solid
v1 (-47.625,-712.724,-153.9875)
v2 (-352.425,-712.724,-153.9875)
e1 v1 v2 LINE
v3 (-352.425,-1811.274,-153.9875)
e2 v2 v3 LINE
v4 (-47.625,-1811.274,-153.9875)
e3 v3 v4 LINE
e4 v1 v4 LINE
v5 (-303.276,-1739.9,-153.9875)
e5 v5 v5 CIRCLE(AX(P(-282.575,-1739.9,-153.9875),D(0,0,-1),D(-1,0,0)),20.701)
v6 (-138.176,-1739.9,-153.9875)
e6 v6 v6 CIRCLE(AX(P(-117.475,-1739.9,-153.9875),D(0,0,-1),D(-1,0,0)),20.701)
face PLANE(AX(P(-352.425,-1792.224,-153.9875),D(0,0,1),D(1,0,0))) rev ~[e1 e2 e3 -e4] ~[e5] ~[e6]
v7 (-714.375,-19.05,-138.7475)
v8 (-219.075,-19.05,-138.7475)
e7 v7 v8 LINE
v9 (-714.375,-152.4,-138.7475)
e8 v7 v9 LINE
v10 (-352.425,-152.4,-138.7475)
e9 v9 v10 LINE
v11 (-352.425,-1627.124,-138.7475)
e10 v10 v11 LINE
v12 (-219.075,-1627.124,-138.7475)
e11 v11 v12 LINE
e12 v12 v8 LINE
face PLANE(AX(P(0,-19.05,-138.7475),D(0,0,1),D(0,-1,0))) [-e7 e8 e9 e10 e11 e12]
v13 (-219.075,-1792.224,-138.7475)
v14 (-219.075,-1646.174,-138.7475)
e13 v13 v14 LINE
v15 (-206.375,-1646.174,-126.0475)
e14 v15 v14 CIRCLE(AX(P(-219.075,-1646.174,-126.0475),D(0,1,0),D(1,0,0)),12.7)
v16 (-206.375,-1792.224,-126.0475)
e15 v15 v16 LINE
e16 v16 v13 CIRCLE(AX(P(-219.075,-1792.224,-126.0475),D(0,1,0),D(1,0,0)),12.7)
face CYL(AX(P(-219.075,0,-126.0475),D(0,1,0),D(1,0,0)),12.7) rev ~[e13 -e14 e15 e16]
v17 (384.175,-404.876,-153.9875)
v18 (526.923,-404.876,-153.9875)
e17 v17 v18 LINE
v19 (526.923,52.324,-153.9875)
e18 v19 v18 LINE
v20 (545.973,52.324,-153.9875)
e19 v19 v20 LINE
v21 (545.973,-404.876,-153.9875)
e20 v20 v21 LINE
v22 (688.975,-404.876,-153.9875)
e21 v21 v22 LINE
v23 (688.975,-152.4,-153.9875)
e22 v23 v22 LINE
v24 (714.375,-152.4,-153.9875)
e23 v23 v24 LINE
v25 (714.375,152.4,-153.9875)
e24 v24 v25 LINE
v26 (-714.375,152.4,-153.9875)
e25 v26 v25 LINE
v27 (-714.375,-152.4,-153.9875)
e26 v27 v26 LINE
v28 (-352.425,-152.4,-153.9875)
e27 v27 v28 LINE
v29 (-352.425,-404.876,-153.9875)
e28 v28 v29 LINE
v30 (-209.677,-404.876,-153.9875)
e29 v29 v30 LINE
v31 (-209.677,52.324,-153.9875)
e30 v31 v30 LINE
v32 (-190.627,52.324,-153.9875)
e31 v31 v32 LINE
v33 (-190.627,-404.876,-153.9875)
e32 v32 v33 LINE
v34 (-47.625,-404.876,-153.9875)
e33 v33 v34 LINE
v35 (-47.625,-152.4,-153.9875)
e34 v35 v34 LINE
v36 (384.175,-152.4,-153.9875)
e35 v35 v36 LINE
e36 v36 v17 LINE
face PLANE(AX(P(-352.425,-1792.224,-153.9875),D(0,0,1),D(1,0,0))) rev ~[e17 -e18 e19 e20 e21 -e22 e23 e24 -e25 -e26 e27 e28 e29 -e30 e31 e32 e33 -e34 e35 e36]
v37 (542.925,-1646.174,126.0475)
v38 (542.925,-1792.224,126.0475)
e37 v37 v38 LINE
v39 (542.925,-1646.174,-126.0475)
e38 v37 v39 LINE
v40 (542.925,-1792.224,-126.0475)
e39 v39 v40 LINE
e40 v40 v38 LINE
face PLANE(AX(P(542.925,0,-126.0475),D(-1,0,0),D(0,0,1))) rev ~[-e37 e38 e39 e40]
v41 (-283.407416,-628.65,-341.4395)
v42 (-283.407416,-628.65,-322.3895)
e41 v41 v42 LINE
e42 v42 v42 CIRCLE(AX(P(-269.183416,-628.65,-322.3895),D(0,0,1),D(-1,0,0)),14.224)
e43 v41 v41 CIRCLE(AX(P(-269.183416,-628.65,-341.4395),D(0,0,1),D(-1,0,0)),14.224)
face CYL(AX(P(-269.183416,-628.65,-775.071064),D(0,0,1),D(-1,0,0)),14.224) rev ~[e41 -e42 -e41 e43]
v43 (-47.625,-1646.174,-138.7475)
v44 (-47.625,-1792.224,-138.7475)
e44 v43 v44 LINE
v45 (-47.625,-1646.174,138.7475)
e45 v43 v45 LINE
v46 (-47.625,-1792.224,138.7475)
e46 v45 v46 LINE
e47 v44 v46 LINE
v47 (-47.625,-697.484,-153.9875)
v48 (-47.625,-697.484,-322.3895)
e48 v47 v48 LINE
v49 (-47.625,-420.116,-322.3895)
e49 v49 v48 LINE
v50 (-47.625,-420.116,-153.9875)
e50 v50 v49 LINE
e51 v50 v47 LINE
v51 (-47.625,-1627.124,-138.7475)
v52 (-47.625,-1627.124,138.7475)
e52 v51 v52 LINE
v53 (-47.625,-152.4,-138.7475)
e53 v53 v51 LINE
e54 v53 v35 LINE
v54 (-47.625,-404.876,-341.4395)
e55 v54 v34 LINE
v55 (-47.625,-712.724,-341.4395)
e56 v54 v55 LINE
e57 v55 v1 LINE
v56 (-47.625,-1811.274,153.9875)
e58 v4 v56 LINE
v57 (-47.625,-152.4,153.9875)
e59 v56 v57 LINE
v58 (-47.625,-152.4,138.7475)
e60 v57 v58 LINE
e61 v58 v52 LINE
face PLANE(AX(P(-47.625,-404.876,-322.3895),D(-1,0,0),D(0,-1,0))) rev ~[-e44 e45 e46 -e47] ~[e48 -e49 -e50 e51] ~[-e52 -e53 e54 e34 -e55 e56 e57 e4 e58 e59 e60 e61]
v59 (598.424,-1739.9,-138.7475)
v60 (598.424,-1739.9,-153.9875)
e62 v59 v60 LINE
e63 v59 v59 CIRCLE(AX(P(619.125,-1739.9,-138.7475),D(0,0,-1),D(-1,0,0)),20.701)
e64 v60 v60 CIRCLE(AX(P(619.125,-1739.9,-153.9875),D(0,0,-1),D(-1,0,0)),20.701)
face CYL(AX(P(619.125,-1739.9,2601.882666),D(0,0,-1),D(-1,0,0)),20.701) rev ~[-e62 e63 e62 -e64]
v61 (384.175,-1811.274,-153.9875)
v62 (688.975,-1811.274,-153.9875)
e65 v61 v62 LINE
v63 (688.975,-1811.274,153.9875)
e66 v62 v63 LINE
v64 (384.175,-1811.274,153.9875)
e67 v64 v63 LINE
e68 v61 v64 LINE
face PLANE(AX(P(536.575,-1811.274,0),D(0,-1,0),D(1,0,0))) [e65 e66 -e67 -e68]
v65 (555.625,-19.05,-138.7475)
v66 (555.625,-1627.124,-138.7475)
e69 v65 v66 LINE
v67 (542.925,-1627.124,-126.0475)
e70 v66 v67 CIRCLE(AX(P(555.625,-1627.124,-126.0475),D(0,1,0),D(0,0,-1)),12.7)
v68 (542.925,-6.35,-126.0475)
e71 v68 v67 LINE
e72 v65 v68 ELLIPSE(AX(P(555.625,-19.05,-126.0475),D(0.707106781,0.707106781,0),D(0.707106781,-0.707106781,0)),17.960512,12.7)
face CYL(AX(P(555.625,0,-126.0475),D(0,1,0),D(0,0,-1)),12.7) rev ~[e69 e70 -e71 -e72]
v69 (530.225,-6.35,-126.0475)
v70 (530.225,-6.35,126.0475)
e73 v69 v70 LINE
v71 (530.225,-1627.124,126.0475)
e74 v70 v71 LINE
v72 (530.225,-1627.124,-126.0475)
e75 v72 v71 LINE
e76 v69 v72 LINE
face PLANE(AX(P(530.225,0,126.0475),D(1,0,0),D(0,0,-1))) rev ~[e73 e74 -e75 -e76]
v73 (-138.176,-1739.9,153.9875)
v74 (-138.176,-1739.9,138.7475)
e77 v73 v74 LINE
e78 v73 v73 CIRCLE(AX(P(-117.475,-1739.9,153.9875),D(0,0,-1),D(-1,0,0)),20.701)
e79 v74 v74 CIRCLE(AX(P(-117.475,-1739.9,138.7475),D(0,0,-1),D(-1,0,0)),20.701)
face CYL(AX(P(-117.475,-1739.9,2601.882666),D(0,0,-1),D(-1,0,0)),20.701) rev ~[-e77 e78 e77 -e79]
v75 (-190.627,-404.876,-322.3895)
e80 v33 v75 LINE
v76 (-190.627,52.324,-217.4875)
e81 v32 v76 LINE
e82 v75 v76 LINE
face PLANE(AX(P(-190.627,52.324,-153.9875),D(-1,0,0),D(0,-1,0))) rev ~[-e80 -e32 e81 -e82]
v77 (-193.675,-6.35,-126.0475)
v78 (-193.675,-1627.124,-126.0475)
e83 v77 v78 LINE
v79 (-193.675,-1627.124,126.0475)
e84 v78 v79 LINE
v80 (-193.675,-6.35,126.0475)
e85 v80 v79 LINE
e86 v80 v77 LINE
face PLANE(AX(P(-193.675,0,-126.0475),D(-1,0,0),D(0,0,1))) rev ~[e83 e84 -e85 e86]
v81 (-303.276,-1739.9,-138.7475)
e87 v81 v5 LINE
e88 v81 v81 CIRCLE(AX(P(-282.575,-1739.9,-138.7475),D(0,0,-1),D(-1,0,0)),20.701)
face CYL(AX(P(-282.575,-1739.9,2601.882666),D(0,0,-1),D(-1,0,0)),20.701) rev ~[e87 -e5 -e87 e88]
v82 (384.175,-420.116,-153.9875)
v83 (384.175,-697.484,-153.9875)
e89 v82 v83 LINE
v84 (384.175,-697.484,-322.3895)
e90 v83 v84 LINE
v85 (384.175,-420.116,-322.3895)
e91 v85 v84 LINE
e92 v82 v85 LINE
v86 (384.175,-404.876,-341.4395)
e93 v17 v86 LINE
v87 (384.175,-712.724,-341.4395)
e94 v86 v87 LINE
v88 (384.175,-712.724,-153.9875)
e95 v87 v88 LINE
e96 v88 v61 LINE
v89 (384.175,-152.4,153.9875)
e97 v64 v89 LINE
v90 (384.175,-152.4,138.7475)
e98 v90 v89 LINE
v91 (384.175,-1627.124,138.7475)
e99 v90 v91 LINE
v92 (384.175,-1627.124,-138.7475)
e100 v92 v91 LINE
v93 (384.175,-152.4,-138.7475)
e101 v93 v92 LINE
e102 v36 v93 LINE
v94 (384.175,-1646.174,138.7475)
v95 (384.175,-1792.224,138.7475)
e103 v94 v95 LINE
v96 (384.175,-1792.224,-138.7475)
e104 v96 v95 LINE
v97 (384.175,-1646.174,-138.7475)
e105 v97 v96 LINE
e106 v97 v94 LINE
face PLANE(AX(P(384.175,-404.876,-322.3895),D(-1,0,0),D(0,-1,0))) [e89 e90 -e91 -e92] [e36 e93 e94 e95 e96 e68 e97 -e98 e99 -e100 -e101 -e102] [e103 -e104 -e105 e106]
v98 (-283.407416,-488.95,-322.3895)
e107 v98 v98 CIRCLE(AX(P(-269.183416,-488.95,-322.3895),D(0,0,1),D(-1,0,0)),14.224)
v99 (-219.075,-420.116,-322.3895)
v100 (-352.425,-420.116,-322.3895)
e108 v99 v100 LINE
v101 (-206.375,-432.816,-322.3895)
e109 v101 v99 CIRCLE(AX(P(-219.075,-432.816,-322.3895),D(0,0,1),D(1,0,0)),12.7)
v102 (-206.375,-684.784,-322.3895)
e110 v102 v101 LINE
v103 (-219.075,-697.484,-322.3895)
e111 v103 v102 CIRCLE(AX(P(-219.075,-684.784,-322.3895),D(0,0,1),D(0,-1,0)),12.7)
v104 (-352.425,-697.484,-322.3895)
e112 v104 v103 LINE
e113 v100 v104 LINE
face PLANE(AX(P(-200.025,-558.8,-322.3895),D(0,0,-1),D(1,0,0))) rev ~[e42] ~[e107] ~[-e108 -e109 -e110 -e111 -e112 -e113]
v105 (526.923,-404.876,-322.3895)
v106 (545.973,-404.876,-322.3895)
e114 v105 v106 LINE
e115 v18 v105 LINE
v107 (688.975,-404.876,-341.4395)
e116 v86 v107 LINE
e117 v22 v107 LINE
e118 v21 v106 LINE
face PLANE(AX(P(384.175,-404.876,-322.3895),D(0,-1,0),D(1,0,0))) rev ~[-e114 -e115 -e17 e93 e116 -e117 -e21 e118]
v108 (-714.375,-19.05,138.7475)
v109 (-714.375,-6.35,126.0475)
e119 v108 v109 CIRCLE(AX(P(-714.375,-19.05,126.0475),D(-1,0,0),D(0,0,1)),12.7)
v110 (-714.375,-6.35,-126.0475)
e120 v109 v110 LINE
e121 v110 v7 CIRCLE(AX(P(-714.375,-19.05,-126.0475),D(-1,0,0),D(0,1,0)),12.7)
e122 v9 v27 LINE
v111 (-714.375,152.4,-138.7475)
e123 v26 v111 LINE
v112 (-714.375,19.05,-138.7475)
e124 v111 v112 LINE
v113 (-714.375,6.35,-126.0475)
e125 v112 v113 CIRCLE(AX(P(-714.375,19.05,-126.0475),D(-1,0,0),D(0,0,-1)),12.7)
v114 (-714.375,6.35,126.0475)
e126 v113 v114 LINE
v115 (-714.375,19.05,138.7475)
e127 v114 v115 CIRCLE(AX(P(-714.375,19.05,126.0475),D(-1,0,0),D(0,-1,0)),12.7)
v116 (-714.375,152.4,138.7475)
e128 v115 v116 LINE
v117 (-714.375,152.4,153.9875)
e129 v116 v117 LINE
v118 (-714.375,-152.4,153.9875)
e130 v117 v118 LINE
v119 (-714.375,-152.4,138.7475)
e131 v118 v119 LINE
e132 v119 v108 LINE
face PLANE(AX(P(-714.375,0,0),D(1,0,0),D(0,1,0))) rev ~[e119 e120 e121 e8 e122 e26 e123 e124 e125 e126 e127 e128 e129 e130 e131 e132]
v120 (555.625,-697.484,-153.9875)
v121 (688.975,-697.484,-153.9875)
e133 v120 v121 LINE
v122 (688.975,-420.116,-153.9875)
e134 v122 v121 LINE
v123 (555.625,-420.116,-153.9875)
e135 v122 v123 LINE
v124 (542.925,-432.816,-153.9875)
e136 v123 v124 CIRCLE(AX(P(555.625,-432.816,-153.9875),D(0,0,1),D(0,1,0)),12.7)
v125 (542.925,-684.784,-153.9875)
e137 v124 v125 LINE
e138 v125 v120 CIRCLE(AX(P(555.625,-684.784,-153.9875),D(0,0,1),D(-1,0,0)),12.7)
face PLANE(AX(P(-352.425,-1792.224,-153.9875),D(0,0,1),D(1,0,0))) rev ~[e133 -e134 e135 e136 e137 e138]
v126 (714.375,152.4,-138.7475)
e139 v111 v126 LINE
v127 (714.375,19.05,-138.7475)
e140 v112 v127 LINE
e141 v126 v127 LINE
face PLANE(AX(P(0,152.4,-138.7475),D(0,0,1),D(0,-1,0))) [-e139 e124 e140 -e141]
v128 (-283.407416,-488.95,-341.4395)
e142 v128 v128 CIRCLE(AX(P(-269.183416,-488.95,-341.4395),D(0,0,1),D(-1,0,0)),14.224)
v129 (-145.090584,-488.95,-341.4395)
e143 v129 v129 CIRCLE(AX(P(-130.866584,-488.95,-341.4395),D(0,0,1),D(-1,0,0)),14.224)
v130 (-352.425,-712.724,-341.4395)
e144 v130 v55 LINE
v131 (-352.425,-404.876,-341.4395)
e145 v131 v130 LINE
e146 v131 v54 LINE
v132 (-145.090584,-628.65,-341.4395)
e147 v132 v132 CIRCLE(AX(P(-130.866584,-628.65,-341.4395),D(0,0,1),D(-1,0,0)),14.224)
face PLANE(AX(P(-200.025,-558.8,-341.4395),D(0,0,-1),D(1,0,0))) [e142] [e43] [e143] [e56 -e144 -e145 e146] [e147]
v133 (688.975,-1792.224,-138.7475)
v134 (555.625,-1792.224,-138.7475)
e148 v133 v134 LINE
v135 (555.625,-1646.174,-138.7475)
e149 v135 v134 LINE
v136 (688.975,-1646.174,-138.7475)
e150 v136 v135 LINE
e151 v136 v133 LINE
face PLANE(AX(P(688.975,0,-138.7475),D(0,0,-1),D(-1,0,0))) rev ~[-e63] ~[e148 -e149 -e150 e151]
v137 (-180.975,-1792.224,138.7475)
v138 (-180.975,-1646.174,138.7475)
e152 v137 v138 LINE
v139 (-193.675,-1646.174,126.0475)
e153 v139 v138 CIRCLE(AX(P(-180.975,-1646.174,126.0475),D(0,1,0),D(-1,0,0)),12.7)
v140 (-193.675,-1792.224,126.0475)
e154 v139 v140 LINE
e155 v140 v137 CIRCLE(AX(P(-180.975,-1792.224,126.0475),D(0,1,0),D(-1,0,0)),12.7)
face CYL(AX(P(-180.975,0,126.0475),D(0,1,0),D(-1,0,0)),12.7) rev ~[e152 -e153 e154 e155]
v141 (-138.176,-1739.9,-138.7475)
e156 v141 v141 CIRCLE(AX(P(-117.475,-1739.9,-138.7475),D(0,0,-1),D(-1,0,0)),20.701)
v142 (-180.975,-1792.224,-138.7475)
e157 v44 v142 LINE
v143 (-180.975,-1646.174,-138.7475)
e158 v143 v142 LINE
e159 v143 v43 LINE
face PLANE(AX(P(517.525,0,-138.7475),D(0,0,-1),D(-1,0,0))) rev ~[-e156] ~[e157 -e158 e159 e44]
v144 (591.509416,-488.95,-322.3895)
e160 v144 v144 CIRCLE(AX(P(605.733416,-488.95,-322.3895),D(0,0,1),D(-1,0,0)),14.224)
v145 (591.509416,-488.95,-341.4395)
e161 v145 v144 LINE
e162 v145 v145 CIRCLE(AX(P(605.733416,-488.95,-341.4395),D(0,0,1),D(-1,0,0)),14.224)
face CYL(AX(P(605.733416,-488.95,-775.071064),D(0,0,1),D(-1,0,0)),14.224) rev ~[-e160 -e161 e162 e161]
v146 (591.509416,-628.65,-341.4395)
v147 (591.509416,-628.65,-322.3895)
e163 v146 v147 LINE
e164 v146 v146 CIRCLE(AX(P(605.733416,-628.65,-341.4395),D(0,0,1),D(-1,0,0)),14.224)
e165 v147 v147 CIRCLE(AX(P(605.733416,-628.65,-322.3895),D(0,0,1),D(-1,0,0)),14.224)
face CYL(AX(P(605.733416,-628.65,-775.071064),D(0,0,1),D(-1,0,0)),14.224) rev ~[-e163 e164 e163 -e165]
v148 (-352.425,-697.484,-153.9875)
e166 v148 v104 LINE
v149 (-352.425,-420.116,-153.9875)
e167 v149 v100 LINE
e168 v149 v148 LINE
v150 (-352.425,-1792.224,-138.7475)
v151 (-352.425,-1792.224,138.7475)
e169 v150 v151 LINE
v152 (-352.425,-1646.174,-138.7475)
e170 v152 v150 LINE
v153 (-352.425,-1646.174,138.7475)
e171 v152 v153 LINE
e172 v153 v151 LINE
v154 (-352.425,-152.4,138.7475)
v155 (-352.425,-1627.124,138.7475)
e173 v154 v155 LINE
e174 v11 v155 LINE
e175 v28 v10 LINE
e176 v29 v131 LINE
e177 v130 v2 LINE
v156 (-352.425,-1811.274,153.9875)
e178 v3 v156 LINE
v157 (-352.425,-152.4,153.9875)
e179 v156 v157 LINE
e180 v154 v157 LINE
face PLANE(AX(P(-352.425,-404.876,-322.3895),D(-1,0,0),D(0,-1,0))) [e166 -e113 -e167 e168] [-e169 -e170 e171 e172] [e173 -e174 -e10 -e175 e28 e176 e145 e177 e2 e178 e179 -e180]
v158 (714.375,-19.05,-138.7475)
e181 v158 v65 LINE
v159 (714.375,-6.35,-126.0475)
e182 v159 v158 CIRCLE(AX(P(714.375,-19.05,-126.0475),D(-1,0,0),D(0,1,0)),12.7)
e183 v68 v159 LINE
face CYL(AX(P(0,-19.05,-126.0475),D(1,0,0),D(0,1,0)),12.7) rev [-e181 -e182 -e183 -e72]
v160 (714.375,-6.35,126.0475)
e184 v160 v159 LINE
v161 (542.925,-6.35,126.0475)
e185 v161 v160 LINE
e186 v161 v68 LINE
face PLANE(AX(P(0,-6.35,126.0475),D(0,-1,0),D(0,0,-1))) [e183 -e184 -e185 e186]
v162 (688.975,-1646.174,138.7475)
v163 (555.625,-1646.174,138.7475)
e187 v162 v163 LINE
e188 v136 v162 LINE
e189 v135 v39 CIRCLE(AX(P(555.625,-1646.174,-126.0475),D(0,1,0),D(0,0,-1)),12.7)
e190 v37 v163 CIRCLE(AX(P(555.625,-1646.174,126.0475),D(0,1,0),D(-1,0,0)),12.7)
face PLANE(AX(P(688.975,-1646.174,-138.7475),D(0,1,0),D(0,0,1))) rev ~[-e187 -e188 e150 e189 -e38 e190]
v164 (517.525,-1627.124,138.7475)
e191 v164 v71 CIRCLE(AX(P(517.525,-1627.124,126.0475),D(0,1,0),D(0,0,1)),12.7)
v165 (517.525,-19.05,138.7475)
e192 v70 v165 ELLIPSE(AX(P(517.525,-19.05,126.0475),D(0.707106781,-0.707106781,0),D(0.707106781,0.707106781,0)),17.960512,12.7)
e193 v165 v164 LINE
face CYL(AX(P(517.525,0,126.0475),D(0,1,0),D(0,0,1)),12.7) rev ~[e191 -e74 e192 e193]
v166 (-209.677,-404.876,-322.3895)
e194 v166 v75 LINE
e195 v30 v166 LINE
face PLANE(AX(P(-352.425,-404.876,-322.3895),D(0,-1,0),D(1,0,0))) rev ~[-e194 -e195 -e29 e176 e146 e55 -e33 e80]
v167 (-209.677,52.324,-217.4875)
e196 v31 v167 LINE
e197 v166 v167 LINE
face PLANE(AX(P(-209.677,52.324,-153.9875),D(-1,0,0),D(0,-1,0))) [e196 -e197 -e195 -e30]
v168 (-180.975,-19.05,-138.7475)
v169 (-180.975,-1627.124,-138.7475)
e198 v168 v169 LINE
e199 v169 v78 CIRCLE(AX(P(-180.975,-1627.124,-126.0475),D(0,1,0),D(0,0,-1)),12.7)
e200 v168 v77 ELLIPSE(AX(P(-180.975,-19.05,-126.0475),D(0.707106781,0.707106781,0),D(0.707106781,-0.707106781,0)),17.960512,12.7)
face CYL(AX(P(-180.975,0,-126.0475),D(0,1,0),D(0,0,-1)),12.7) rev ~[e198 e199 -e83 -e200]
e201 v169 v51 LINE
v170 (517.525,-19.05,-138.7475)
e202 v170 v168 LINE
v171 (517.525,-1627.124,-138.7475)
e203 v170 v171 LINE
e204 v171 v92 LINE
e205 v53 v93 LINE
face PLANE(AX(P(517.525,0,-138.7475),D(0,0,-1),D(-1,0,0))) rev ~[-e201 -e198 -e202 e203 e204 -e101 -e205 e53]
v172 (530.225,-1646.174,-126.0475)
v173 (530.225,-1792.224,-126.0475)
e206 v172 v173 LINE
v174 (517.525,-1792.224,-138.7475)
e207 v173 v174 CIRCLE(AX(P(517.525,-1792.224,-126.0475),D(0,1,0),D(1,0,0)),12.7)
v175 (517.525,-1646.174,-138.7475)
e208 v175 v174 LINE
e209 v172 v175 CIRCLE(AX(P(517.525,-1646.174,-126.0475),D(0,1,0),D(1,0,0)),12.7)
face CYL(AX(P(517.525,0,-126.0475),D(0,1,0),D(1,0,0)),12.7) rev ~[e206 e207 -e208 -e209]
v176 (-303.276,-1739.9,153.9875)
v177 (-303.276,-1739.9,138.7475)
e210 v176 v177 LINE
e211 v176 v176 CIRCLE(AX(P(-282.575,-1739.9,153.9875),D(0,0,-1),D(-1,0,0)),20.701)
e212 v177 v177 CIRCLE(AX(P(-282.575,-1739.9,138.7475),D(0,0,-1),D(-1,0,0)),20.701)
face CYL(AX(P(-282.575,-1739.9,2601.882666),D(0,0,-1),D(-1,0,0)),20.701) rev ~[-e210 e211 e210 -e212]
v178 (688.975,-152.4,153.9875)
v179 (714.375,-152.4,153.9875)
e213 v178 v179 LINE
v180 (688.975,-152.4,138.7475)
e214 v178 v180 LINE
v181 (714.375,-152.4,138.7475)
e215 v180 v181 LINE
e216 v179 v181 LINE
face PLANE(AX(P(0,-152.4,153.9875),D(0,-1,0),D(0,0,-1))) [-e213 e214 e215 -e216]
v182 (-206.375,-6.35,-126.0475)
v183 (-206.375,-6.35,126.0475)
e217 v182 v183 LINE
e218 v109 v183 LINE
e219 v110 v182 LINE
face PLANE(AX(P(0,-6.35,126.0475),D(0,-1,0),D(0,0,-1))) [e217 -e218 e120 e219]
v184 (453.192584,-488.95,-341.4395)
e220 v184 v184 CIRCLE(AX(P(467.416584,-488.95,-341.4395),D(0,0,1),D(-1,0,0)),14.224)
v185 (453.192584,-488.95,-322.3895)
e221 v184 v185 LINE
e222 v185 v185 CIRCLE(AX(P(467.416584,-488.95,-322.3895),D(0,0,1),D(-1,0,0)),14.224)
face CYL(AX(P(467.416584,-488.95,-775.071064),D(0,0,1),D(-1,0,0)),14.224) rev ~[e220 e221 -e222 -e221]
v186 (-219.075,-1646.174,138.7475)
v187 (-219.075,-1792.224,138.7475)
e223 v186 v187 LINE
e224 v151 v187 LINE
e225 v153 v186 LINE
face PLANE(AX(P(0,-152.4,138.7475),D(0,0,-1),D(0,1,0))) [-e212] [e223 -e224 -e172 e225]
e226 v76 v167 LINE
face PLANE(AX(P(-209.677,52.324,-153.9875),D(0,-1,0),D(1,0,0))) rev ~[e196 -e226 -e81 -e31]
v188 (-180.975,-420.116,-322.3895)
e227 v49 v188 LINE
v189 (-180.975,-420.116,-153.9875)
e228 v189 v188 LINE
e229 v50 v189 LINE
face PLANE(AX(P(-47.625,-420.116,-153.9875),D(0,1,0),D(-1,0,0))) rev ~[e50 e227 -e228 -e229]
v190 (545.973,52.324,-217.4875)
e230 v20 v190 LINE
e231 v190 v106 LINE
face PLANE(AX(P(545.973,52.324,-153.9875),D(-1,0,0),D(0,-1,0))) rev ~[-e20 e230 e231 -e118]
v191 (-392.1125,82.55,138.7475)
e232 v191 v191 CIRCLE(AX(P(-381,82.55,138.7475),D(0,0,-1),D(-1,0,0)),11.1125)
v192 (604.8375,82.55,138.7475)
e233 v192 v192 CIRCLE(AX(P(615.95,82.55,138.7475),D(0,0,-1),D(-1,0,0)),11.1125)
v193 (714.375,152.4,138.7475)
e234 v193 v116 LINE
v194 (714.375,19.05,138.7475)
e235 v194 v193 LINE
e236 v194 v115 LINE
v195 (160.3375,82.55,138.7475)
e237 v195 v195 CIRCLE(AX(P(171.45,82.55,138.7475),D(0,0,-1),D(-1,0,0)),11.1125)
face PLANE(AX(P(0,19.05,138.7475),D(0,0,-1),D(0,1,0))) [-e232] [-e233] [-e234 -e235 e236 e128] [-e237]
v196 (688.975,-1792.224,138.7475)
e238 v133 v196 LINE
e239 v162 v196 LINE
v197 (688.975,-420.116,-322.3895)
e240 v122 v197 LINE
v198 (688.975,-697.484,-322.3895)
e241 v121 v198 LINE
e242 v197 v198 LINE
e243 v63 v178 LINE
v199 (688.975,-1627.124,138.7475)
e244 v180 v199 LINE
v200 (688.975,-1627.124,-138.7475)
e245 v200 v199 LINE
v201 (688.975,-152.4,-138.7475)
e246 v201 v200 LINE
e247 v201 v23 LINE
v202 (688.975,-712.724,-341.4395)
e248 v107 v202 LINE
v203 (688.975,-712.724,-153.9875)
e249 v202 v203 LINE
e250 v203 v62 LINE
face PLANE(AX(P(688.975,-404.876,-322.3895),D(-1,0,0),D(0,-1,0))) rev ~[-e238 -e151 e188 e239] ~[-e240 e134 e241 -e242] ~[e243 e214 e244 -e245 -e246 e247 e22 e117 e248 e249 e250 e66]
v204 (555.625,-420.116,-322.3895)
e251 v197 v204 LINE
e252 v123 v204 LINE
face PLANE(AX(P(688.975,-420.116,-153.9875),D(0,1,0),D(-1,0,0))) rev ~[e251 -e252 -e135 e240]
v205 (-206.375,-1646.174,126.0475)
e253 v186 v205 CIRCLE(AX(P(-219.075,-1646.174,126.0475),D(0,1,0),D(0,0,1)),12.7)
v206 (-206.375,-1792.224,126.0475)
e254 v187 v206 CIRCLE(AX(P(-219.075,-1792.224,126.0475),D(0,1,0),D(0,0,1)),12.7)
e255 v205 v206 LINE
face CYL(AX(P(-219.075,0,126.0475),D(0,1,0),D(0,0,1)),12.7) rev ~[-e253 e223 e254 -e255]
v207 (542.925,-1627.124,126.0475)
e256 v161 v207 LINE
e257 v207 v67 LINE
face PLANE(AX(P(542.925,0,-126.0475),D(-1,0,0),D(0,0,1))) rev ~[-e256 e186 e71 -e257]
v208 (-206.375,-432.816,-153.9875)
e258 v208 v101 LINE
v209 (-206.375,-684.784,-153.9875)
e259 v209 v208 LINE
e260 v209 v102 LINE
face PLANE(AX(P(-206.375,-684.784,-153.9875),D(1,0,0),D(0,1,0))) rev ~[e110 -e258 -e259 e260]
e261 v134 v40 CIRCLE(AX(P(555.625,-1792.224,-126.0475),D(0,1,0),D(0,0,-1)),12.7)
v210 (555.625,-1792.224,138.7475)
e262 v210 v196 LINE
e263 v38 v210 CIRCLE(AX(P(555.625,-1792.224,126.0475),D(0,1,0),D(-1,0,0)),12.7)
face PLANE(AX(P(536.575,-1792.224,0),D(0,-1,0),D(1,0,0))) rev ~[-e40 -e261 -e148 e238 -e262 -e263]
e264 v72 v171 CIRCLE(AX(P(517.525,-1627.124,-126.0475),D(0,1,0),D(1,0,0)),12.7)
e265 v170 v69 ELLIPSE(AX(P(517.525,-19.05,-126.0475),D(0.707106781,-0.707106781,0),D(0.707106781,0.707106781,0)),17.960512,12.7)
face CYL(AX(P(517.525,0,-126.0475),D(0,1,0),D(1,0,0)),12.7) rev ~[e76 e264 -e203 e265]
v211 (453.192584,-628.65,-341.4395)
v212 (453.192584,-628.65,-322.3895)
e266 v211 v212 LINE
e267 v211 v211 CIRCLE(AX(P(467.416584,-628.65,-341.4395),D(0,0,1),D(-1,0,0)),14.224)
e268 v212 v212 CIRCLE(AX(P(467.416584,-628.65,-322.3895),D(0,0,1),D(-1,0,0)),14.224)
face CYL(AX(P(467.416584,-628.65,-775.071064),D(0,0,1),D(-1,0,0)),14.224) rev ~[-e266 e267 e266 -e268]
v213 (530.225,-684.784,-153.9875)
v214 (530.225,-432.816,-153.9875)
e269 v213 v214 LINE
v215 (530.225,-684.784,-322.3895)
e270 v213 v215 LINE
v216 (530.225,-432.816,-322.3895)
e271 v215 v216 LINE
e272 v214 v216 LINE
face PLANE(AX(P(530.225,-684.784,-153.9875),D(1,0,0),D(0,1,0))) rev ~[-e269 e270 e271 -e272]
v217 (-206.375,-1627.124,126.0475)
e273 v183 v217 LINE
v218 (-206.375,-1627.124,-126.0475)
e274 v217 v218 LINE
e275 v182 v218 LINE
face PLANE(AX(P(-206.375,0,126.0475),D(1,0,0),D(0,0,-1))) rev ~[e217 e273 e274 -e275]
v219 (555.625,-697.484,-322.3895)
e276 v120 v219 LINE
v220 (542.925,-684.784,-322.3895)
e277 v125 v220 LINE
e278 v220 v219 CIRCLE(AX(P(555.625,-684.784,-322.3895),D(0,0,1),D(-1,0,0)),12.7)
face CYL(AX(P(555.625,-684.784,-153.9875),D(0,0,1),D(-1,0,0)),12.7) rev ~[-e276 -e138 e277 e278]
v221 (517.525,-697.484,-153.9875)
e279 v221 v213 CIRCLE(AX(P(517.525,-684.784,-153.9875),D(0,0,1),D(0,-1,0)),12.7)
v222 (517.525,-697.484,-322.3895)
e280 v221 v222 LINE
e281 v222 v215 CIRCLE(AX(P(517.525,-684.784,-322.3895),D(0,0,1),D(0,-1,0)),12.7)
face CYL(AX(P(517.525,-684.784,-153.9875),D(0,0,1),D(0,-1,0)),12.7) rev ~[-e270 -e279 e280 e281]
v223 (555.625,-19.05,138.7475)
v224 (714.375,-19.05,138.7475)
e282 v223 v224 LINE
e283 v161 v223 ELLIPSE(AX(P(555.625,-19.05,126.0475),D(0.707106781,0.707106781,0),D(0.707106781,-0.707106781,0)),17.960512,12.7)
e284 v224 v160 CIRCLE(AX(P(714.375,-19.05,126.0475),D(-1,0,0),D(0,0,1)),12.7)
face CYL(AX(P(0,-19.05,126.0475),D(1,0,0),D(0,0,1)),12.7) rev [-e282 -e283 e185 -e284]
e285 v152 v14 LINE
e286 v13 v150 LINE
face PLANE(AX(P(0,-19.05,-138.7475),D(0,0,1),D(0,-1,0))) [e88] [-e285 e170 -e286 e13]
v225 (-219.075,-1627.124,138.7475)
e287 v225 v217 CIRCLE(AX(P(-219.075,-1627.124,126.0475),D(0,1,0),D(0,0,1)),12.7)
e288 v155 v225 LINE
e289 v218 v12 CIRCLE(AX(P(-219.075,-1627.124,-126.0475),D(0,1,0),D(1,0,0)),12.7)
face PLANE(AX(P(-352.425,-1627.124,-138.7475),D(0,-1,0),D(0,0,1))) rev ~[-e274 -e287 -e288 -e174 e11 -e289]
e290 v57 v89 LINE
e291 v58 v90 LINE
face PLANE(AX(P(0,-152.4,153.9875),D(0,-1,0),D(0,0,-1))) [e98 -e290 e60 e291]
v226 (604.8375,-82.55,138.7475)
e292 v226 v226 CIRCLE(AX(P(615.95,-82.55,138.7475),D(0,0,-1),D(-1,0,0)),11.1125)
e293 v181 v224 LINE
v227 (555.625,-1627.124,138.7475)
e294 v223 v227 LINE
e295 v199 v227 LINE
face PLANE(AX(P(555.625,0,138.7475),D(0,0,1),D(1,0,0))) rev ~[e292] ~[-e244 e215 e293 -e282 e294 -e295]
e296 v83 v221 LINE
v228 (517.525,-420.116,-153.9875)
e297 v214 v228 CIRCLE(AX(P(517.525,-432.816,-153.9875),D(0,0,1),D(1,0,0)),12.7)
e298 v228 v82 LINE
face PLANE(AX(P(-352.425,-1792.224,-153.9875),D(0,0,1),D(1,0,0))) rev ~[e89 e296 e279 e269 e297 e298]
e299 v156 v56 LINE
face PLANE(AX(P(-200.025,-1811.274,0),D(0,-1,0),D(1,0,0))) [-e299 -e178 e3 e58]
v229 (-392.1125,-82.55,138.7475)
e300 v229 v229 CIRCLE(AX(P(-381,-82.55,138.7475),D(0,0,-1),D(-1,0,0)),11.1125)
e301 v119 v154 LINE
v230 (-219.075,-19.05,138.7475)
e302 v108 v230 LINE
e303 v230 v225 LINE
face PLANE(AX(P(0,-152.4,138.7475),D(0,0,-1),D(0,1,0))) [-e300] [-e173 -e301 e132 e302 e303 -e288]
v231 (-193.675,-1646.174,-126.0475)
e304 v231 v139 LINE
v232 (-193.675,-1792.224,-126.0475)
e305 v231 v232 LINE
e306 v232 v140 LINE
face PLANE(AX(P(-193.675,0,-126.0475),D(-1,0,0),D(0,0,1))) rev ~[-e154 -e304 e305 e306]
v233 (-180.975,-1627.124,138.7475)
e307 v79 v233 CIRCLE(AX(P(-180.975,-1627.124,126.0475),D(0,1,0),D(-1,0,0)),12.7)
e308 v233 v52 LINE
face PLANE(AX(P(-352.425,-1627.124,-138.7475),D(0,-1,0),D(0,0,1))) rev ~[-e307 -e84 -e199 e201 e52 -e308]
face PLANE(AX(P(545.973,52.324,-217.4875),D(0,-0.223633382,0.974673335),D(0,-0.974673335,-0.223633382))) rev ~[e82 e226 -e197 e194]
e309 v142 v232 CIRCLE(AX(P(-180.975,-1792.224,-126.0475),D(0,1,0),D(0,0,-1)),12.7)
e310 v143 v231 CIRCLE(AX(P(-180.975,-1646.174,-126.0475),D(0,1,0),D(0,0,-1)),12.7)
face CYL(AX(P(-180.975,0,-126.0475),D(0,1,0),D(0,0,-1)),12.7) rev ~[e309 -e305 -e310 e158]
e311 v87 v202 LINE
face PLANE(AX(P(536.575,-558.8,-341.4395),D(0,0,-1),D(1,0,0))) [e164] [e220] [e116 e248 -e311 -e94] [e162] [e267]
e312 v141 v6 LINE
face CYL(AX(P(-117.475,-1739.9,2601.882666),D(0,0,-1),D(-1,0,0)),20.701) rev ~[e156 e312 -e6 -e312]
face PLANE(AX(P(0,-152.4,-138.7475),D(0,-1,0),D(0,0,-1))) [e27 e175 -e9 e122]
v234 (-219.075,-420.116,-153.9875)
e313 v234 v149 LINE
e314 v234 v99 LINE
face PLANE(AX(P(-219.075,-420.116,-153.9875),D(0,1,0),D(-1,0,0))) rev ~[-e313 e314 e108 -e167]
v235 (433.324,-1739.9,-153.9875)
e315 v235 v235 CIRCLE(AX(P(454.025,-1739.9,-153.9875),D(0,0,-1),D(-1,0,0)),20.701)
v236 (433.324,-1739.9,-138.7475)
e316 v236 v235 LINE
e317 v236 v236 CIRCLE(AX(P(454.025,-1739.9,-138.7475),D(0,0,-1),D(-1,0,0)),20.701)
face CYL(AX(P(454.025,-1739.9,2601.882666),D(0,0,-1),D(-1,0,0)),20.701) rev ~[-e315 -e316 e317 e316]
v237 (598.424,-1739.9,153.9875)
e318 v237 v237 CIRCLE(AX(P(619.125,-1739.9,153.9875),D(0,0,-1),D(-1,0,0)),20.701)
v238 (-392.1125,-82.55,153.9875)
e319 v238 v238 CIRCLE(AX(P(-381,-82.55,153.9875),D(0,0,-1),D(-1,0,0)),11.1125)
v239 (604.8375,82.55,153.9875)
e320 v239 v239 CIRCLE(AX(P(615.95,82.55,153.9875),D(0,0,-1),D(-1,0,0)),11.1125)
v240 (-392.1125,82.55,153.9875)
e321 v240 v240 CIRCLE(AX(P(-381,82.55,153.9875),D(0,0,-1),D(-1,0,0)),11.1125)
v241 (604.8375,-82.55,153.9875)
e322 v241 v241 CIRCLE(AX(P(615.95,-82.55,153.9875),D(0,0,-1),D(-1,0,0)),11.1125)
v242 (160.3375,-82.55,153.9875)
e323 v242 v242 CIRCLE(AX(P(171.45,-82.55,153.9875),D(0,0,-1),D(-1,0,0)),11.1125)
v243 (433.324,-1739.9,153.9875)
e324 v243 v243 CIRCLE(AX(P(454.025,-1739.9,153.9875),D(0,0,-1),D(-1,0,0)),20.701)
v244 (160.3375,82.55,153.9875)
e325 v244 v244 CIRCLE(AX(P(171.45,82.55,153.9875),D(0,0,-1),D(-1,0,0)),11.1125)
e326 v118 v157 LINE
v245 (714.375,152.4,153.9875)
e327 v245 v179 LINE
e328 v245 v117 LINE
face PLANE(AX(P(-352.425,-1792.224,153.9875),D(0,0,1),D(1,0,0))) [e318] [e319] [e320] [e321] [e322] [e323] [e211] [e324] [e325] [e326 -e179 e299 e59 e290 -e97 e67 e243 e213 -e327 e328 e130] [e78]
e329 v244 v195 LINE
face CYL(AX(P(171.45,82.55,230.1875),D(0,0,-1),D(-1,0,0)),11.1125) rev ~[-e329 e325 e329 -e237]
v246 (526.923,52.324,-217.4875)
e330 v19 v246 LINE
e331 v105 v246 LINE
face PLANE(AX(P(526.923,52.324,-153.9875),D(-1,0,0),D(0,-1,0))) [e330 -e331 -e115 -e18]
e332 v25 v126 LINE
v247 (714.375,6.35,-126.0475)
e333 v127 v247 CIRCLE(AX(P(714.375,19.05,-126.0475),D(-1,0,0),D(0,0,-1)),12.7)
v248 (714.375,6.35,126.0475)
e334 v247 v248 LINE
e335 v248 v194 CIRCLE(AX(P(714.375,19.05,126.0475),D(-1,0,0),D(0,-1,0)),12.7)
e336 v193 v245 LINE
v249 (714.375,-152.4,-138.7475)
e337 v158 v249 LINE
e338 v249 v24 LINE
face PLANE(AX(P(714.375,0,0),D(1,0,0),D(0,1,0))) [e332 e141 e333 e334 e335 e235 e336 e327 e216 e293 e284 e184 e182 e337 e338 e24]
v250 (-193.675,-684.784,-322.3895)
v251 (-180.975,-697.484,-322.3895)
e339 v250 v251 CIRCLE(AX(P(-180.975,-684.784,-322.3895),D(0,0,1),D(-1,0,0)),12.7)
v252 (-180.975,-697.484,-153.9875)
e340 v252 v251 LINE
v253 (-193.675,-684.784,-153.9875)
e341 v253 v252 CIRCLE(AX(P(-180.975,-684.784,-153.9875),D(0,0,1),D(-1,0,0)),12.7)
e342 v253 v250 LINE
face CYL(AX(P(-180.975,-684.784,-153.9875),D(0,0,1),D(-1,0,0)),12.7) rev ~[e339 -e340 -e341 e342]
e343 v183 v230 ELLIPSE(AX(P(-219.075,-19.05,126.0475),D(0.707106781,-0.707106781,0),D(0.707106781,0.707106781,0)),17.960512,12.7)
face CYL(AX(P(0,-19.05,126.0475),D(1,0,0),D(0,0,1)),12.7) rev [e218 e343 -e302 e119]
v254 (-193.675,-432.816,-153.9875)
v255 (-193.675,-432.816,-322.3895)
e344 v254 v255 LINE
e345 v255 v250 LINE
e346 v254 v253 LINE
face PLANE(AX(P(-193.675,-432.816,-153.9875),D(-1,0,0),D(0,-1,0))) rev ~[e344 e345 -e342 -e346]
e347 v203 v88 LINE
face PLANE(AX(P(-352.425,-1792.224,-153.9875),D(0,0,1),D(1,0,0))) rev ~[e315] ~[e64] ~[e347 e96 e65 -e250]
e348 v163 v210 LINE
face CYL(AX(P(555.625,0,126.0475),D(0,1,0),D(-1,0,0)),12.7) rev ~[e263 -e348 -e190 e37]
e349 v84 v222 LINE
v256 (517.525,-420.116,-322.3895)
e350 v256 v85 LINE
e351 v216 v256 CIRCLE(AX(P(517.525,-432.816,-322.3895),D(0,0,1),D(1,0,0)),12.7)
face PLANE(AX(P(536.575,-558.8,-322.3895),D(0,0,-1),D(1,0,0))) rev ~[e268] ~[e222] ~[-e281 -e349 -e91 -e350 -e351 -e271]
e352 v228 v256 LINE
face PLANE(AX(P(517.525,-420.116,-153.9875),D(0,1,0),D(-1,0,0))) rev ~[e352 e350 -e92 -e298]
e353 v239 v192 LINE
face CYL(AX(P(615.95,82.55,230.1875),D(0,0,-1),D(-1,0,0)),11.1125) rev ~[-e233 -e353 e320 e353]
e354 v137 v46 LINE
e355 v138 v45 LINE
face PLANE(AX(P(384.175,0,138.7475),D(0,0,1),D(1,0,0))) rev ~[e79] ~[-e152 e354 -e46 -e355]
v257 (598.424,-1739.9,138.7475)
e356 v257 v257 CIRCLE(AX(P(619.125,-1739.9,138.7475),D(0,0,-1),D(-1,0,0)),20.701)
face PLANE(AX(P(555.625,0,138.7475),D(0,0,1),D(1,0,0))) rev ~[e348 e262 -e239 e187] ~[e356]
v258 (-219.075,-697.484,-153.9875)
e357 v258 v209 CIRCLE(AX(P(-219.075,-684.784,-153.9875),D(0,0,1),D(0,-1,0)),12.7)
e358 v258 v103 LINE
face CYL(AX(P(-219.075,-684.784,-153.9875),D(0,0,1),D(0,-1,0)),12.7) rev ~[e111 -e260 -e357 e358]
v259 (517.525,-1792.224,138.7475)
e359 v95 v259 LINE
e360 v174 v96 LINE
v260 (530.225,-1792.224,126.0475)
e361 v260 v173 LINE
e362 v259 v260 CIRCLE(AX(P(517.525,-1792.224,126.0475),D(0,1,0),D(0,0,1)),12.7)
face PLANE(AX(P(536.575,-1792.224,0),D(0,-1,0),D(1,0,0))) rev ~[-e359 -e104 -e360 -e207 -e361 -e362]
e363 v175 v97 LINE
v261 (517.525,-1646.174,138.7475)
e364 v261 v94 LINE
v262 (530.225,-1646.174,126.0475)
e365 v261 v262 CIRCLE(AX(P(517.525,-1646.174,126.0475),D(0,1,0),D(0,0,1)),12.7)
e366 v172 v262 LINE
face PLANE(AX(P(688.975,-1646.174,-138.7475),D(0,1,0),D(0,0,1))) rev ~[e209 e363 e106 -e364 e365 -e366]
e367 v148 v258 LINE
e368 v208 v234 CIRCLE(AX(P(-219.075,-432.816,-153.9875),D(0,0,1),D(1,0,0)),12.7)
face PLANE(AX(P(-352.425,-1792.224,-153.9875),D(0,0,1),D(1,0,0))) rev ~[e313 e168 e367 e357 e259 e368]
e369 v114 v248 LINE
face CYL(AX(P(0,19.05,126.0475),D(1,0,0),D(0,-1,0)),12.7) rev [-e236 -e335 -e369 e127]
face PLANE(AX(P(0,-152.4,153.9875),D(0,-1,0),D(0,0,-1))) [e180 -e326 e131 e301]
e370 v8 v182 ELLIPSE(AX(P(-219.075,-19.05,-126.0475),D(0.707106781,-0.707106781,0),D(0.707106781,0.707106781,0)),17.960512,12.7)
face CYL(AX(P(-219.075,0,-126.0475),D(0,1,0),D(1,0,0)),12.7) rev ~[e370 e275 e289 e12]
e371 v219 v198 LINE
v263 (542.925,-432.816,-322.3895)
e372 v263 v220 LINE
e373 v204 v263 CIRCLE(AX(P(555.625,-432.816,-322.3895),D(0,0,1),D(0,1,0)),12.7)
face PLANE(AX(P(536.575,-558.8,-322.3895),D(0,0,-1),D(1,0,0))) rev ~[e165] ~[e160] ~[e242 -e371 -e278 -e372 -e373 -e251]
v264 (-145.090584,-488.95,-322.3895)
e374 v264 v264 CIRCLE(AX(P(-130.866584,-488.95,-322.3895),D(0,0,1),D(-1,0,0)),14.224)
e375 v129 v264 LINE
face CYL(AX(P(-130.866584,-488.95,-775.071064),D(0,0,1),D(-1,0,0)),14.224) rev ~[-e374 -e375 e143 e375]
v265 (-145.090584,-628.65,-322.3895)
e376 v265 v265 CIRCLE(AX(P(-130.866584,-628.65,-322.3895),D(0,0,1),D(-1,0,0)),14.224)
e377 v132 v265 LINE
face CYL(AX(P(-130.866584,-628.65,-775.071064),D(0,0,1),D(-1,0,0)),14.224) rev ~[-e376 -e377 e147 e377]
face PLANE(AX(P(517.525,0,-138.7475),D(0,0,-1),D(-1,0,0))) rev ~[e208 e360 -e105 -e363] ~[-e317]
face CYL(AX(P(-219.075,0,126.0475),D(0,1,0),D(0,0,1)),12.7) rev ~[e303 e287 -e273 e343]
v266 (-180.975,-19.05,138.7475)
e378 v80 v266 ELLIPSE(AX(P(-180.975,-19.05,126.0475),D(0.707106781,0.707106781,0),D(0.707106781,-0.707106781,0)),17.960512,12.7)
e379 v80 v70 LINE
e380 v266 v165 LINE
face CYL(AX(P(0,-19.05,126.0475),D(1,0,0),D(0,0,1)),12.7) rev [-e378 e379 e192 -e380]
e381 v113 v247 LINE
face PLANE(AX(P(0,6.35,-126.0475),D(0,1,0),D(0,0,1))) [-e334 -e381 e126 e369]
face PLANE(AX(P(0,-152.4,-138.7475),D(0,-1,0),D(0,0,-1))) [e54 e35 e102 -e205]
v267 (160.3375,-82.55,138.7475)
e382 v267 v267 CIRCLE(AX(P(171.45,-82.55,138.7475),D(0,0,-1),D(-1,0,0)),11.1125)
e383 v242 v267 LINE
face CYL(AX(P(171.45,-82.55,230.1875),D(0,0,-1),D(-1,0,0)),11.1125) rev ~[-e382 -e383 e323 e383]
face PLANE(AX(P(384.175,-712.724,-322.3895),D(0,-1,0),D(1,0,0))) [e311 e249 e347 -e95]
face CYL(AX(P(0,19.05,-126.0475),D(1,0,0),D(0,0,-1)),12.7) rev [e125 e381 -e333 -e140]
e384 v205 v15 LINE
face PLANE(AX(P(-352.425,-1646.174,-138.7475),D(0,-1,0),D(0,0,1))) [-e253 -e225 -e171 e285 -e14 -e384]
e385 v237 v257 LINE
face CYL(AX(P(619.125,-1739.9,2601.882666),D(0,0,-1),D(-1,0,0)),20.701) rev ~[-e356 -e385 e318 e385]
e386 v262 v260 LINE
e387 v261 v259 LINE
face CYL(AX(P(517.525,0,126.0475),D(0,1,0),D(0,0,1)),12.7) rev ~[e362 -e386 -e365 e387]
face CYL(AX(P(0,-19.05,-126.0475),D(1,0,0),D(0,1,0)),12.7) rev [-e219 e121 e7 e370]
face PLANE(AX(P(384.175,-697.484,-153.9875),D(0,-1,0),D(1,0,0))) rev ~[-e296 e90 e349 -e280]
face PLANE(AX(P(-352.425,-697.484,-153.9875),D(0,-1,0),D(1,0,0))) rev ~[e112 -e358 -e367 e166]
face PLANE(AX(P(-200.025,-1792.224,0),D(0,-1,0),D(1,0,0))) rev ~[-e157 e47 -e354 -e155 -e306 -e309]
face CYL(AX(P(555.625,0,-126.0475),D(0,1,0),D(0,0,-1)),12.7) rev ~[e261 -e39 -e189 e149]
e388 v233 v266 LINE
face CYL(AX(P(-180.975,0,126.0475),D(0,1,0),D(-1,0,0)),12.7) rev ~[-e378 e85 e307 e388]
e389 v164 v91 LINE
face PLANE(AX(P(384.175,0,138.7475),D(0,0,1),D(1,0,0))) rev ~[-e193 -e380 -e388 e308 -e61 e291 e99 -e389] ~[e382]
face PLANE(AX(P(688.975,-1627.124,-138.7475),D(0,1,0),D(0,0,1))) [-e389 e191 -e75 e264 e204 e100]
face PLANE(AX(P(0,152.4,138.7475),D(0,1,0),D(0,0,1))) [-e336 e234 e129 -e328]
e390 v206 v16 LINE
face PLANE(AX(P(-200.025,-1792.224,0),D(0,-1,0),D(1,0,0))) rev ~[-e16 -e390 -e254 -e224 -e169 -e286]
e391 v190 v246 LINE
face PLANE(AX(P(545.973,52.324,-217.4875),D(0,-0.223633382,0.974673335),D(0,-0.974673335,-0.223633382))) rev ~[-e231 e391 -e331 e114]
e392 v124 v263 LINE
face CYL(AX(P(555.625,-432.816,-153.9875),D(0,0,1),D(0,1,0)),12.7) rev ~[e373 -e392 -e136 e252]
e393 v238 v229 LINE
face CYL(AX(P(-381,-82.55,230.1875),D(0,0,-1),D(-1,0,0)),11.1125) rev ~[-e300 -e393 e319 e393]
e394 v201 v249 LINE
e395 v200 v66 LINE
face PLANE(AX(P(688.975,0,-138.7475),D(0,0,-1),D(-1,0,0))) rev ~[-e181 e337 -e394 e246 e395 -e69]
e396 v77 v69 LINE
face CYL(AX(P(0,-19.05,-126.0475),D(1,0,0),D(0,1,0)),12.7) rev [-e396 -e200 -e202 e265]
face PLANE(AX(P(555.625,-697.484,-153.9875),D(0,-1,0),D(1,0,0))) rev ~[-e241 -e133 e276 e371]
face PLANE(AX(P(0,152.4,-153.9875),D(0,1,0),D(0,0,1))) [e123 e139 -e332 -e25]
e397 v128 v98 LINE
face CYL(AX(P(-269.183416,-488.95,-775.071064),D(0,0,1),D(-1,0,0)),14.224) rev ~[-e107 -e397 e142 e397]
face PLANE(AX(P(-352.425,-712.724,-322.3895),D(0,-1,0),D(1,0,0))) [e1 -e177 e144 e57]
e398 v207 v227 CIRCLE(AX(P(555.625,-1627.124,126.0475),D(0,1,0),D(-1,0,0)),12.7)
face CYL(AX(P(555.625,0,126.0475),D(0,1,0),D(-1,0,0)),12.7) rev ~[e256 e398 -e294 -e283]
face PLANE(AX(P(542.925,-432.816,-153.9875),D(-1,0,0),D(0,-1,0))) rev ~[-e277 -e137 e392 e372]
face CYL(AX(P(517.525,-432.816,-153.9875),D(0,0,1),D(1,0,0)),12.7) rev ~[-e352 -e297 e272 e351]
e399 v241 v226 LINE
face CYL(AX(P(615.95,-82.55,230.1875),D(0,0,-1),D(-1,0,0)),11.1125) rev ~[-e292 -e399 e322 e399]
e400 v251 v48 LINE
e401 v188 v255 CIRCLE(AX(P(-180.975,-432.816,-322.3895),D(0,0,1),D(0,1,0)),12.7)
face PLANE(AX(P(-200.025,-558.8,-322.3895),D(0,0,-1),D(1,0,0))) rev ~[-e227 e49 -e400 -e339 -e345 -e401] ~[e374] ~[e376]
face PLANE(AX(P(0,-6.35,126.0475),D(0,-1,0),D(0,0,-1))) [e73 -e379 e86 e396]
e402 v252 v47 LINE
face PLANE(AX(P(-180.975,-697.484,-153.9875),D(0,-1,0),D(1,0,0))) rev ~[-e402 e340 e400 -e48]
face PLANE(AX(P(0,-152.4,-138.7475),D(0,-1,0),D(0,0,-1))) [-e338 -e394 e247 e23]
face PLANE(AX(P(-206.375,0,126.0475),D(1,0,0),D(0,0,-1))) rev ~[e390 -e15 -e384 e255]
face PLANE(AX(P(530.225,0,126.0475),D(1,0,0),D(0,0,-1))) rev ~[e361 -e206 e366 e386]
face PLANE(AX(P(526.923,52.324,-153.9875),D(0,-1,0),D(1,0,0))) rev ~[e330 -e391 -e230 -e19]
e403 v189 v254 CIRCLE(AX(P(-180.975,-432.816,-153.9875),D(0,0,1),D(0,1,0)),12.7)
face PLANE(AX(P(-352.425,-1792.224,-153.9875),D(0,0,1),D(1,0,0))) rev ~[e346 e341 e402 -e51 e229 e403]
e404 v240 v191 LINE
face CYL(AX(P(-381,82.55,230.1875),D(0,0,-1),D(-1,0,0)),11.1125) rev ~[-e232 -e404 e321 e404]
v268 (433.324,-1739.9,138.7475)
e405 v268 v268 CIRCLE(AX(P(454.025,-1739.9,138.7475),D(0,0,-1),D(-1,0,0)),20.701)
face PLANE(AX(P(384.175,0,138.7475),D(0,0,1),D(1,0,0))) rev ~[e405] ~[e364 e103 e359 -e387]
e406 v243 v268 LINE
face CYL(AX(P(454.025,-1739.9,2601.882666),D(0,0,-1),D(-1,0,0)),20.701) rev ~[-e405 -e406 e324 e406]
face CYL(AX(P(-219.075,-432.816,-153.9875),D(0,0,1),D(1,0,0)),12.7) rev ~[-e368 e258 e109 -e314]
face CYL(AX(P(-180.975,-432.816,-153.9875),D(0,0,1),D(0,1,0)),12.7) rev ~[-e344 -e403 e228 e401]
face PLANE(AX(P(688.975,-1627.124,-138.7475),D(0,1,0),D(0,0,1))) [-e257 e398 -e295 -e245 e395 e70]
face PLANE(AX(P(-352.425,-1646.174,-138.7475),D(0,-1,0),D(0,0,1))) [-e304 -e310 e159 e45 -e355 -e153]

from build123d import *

# Parameters (mm, degrees)
F1_DEPTH  = 714.375
F3_D      = 22.225
F3_DEPTH  = 76.2
F3_TIP    = 6.6770636289
F5_DEPTH  = 1792.224
F6_W      = 304.8
F6_H      = 307.975
F7_DEPTH  = 19.05
F10_D     = 22.225
F10_DEPTH = 76.2
F10_TIP   = 6.6770636289
F11_W     = 19.05
F11_H     = 277.495
F12_DEPTH = 304.8
F13_W     = 19.05
F13_H     = 277.495
F14_DEPTH = 304.8
F16_D     = 41.402
F18_DEPTH = 168.402
F19_W     = 304.8
F19_H     = 307.848
F20_DEPTH = 19.05
F22_D     = 28.448
F22_2_D   = 28.448
F24_W     = 19.05
F24_H     = 457.2
F25_DEPTH = 168.402
F27_DEPTH = 1260.349


# Not quite as in the source:
# - a length typed as a fraction of an inch, garbled in the dataset ("3 / 203.2 mm" for 3/8 in), is restored


with BuildPart() as f1:
    # F0 (on Right) → F1 (new body, symmetric)
    with BuildSketch(Plane.YZ):
        with BuildLine():
            Line((152.4, 153.9875), (-152.4, 153.9875))
            Line((-152.4, 153.9875), (-152.4, 138.7475))
            Line((-152.4, 138.7475), (-19.05, 138.7475))
            ThreePointArc((-19.05, 138.7475), (-10.0697438789, 135.0277561211), (-6.35, 126.0475))
            Line((-6.35, 126.0475), (-6.35, -126.0475))
            ThreePointArc((-6.35, -126.0475), (-10.0697438789, -135.0277561211), (-19.05, -138.7475))
            Line((-19.05, -138.7475), (-152.4, -138.7475))
            Line((-152.4, -138.7475), (-152.4, -153.9875))
            Line((-152.4, -153.9875), (152.4, -153.9875))
            Line((152.4, -153.9875), (152.4, -138.7475))
            Line((152.4, -138.7475), (19.05, -138.7475))
            ThreePointArc((19.05, -138.7475), (10.0697438789, -135.0277561211), (6.35, -126.0475))
            Line((6.35, -126.0475), (6.35, 126.0475))
            ThreePointArc((6.35, 126.0475), (10.0697438789, 135.0277561211), (19.05, 138.7475))
            Line((19.05, 138.7475), (152.4, 138.7475))
            Line((152.4, 138.7475), (152.4, 153.9875))
        make_face()
    extrude(amount=F1_DEPTH, both=True)

    # F3
    with Locations(Plane.XY.offset(153.9875)):
        with Locations((-381, 82.55), (-381, -82.55), (171.45, 82.55), (171.45, -82.55), (615.95, 82.55), (615.95, -82.55)):
            Hole(F3_D / 2, depth=F3_DEPTH)
            with Locations((0, 0, -(F3_DEPTH + F3_TIP / 2))):  # 118° drill point
                Cone(0, F3_D / 2, F3_TIP, mode=Mode.SUBTRACT)


with BuildPart() as f5:
    # F4 (on Front) → F5 (new body)
    with BuildSketch(Plane.XZ):
        with BuildLine():
            Line((-47.625, 153.9875), (-352.425, 153.9875))
            Line((-352.425, 153.9875), (-352.425, 138.7475))
            Line((-352.425, 138.7475), (-219.075, 138.7475))
            ThreePointArc((-219.075, 138.7475), (-210.0947438789, 135.0277561211), (-206.375, 126.0475))
            Line((-206.375, 126.0475), (-206.375, -126.0475))
            ThreePointArc((-206.375, -126.0475), (-210.0947438789, -135.0277561211), (-219.075, -138.7475))
            Line((-219.075, -138.7475), (-352.425, -138.7475))
            Line((-352.425, -138.7475), (-352.425, -153.9875))
            Line((-352.425, -153.9875), (-47.625, -153.9875))
            Line((-47.625, -153.9875), (-47.625, -138.7475))
            Line((-47.625, -138.7475), (-180.975, -138.7475))
            ThreePointArc((-180.975, -138.7475), (-189.9552561211, -135.0277561211), (-193.675, -126.0475))
            Line((-193.675, -126.0475), (-193.675, 126.0475))
            ThreePointArc((-193.675, 126.0475), (-189.9552561211, 135.0277561211), (-180.975, 138.7475))
            Line((-180.975, 138.7475), (-47.625, 138.7475))
            Line((-47.625, 138.7475), (-47.625, 153.9875))
        make_face()
    extrude(amount=F5_DEPTH)


with BuildPart() as f5b:
    # F4 (on Front) → F5, piece 2 (new body)
    with BuildSketch(Plane.XZ):
        with BuildLine():
            Line((688.975, 153.9875), (384.175, 153.9875))
            Line((384.175, 153.9875), (384.175, 138.7475))
            Line((384.175, 138.7475), (517.525, 138.7475))
            ThreePointArc((517.525, 138.7475), (526.5052561211, 135.0277561211), (530.225, 126.0475))
            Line((530.225, 126.0475), (530.225, -126.0475))
            ThreePointArc((530.225, -126.0475), (526.5052561211, -135.0277561211), (517.525, -138.7475))
            Line((517.525, -138.7475), (384.175, -138.7475))
            Line((384.175, -138.7475), (384.175, -153.9875))
            Line((384.175, -153.9875), (688.975, -153.9875))
            Line((688.975, -153.9875), (688.975, -138.7475))
            Line((688.975, -138.7475), (555.625, -138.7475))
            ThreePointArc((555.625, -138.7475), (546.6447438789, -135.0277561211), (542.925, -126.0475))
            Line((542.925, -126.0475), (542.925, 126.0475))
            ThreePointArc((542.925, 126.0475), (546.6447438789, 135.0277561211), (555.625, 138.7475))
            Line((555.625, 138.7475), (688.975, 138.7475))
            Line((688.975, 138.7475), (688.975, 153.9875))
        make_face()
    extrude(amount=F5_DEPTH)


with BuildPart() as f7:
    # F6 (on face) → F7 (new body)
    with BuildSketch(Plane.XZ.offset(1792.224)):
        with Locations((-200.025, 0)):
            Rectangle(F6_W, F6_H)
    extrude(amount=F7_DEPTH)


with BuildPart() as f7b:
    # F6 (on face) → F7, piece 2 (new body)
    with BuildSketch(Plane.XZ.offset(1792.224)):
        with Locations((536.575, 0)):
            Rectangle(F6_W, F6_H)
    extrude(amount=F7_DEPTH)


with BuildPart() as f1_1:
    add(f1.part)

    # F8: union F5, F5b, F7b, F7
    add(f5.part)
    add(f5b.part)
    add(f7b.part)
    add(f7.part)

    # F10
    with Locations(Plane.XY.offset(153.9875)):
        with Locations((615.95, -82.55)):
            Hole(F10_D / 2, depth=F10_DEPTH)
            with Locations((0, 0, -(F10_DEPTH + F10_TIP / 2))):  # 118° drill point
                Cone(0, F10_D / 2, F10_TIP, mode=Mode.SUBTRACT)

    # F11 (on face) → F12 (join)
    with BuildSketch(Plane.YZ.offset(688.975)):
        with Locations((-1636.649, 0)):
            Rectangle(F11_W, F11_H)
    extrude(amount=-F12_DEPTH)

    # F13 (on face) → F14 (join)
    with BuildSketch(Plane(origin=(-352.425, 0, 0), x_dir=(0, -1, 0), z_dir=(-1, 0, 0))):
        with Locations((1636.649, 0)):
            Rectangle(F13_W, F13_H)
    extrude(amount=-F14_DEPTH)

    # F16 (through all)
    with Locations(Plane.XY.offset(153.9875)):
        with Locations((619.125, -1739.9), (454.025, -1739.9), (-117.475, -1739.9), (-282.575, -1739.9)):
            Hole(F16_D / 2)


with BuildPart() as f18:
    # F17 (on face) → F18 (new body)
    with BuildSketch(Plane(origin=(0, 0, -153.9875), x_dir=(1, 0, 0), z_dir=(0, 0, -1))):
        with BuildLine():
            Line((-352.425, 420.116), (-352.425, 404.876))
            Line((-352.425, 404.876), (-47.625, 404.876))
            Line((-47.625, 404.876), (-47.625, 420.116))
            Line((-47.625, 420.116), (-180.975, 420.116))
            ThreePointArc((-180.975, 420.116), (-189.9552561211, 423.8357438789), (-193.675, 432.816))
            Line((-193.675, 432.816), (-193.675, 684.784))
            ThreePointArc((-193.675, 684.784), (-189.9552561211, 693.7642561211), (-180.975, 697.484))
            Line((-180.975, 697.484), (-47.625, 697.484))
            Line((-47.625, 697.484), (-47.625, 712.724))
            Line((-47.625, 712.724), (-352.425, 712.724))
            Line((-352.425, 712.724), (-352.425, 697.484))
            Line((-352.425, 697.484), (-219.075, 697.484))
            ThreePointArc((-219.075, 697.484), (-210.0947438789, 693.7642561211), (-206.375, 684.784))
            Line((-206.375, 684.784), (-206.375, 432.816))
            ThreePointArc((-206.375, 432.816), (-210.0947438789, 423.8357438789), (-219.075, 420.116))
            Line((-219.075, 420.116), (-352.425, 420.116))
        make_face()
    extrude(amount=F18_DEPTH)


with BuildPart() as f18b:
    # F17 (on face) → F18, piece 2 (new body)
    with BuildSketch(Plane(origin=(0, 0, -153.9875), x_dir=(1, 0, 0), z_dir=(0, 0, -1))):
        with BuildLine():
            Line((688.975, 420.116), (555.625, 420.116))
            ThreePointArc((555.625, 420.116), (546.6447438789, 423.8357438789), (542.925, 432.816))
            Line((542.925, 432.816), (542.925, 684.784))
            ThreePointArc((542.925, 684.784), (546.6447438789, 693.7642561211), (555.625, 697.484))
            Line((555.625, 697.484), (688.975, 697.484))
            Line((688.975, 697.484), (688.975, 712.724))
            Line((688.975, 712.724), (384.175, 712.724))
            Line((384.175, 712.724), (384.175, 697.484))
            Line((384.175, 697.484), (517.525, 697.484))
            ThreePointArc((517.525, 697.484), (526.5052561211, 693.7642561211), (530.225, 684.784))
            Line((530.225, 684.784), (530.225, 432.816))
            ThreePointArc((530.225, 432.816), (526.5052561211, 423.8357438789), (517.525, 420.116))
            Line((517.525, 420.116), (384.175, 420.116))
            Line((384.175, 420.116), (384.175, 404.876))
            Line((384.175, 404.876), (688.975, 404.876))
            Line((688.975, 404.876), (688.975, 420.116))
        make_face()
    extrude(amount=F18_DEPTH)


with BuildPart() as f20:
    # F19 (on face) → F20 (new body)
    with BuildSketch(Plane(origin=(0, 0, -322.3895), x_dir=(1, 0, 0), z_dir=(0, 0, -1))):
        with Locations((-200.025, 558.8)):
            Rectangle(F19_W, F19_H)
    extrude(amount=F20_DEPTH)

    # F22 (through all)
    with Locations(Plane(origin=(0, 0, -341.4395), x_dir=(1, 0, 0), z_dir=(0, 0, -1))):
        with Locations((-269.1834158416, 628.65), (-130.8665841584, 628.65), (-269.1834158416, 488.95), (-130.8665841584, 488.95), (467.4165841584, 628.65), (605.7334158416, 628.65), (605.7334158416, 488.95), (467.4165841584, 488.95)):
            Hole(F22_D / 2)


with BuildPart() as f20b:
    # F19 (on face) → F20, piece 2 (new body)
    with BuildSketch(Plane(origin=(0, 0, -322.3895), x_dir=(1, 0, 0), z_dir=(0, 0, -1))):
        with Locations((536.575, 558.8)):
            Rectangle(F19_W, F19_H)
    extrude(amount=F20_DEPTH)

    # F22#2 (through all)
    with Locations(Plane(origin=(0, 0, -341.4395), x_dir=(1, 0, 0), z_dir=(0, 0, -1))):
        with Locations((-269.1834158416, 628.65), (-130.8665841584, 628.65), (-269.1834158416, 488.95), (-130.8665841584, 488.95), (467.4165841584, 628.65), (605.7334158416, 628.65), (605.7334158416, 488.95), (467.4165841584, 488.95)):
            Hole(F22_2_D / 2)


with BuildPart() as f1_2:
    add(f1_1.part)

    # F23: union F18, F20, F18b, F20b
    add(f18.part)
    add(f20.part)
    add(f18b.part)
    add(f20b.part)

    # F24 (on face) → F25 (join)
    with BuildSketch(Plane(origin=(0, 0, -153.9875), x_dir=(1, 0, 0), z_dir=(0, 0, -1))):
        with Locations((-200.152, 176.276)):
            Rectangle(F24_W, F24_H)
        with Locations((536.448, 176.276)):
            Rectangle(F24_W, F24_H)
    extrude(amount=F25_DEPTH)

    # F26 (on face) → F27 (cut, through all)
    with BuildSketch(Plane.YZ.offset(545.973)):
        Polygon((52.324, -322.3895), (52.324, -217.4875), (-404.876, -322.3895), align=None)
    extrude(amount=-F27_DEPTH, mode=Mode.SUBTRACT)


solid = f1_2.part
